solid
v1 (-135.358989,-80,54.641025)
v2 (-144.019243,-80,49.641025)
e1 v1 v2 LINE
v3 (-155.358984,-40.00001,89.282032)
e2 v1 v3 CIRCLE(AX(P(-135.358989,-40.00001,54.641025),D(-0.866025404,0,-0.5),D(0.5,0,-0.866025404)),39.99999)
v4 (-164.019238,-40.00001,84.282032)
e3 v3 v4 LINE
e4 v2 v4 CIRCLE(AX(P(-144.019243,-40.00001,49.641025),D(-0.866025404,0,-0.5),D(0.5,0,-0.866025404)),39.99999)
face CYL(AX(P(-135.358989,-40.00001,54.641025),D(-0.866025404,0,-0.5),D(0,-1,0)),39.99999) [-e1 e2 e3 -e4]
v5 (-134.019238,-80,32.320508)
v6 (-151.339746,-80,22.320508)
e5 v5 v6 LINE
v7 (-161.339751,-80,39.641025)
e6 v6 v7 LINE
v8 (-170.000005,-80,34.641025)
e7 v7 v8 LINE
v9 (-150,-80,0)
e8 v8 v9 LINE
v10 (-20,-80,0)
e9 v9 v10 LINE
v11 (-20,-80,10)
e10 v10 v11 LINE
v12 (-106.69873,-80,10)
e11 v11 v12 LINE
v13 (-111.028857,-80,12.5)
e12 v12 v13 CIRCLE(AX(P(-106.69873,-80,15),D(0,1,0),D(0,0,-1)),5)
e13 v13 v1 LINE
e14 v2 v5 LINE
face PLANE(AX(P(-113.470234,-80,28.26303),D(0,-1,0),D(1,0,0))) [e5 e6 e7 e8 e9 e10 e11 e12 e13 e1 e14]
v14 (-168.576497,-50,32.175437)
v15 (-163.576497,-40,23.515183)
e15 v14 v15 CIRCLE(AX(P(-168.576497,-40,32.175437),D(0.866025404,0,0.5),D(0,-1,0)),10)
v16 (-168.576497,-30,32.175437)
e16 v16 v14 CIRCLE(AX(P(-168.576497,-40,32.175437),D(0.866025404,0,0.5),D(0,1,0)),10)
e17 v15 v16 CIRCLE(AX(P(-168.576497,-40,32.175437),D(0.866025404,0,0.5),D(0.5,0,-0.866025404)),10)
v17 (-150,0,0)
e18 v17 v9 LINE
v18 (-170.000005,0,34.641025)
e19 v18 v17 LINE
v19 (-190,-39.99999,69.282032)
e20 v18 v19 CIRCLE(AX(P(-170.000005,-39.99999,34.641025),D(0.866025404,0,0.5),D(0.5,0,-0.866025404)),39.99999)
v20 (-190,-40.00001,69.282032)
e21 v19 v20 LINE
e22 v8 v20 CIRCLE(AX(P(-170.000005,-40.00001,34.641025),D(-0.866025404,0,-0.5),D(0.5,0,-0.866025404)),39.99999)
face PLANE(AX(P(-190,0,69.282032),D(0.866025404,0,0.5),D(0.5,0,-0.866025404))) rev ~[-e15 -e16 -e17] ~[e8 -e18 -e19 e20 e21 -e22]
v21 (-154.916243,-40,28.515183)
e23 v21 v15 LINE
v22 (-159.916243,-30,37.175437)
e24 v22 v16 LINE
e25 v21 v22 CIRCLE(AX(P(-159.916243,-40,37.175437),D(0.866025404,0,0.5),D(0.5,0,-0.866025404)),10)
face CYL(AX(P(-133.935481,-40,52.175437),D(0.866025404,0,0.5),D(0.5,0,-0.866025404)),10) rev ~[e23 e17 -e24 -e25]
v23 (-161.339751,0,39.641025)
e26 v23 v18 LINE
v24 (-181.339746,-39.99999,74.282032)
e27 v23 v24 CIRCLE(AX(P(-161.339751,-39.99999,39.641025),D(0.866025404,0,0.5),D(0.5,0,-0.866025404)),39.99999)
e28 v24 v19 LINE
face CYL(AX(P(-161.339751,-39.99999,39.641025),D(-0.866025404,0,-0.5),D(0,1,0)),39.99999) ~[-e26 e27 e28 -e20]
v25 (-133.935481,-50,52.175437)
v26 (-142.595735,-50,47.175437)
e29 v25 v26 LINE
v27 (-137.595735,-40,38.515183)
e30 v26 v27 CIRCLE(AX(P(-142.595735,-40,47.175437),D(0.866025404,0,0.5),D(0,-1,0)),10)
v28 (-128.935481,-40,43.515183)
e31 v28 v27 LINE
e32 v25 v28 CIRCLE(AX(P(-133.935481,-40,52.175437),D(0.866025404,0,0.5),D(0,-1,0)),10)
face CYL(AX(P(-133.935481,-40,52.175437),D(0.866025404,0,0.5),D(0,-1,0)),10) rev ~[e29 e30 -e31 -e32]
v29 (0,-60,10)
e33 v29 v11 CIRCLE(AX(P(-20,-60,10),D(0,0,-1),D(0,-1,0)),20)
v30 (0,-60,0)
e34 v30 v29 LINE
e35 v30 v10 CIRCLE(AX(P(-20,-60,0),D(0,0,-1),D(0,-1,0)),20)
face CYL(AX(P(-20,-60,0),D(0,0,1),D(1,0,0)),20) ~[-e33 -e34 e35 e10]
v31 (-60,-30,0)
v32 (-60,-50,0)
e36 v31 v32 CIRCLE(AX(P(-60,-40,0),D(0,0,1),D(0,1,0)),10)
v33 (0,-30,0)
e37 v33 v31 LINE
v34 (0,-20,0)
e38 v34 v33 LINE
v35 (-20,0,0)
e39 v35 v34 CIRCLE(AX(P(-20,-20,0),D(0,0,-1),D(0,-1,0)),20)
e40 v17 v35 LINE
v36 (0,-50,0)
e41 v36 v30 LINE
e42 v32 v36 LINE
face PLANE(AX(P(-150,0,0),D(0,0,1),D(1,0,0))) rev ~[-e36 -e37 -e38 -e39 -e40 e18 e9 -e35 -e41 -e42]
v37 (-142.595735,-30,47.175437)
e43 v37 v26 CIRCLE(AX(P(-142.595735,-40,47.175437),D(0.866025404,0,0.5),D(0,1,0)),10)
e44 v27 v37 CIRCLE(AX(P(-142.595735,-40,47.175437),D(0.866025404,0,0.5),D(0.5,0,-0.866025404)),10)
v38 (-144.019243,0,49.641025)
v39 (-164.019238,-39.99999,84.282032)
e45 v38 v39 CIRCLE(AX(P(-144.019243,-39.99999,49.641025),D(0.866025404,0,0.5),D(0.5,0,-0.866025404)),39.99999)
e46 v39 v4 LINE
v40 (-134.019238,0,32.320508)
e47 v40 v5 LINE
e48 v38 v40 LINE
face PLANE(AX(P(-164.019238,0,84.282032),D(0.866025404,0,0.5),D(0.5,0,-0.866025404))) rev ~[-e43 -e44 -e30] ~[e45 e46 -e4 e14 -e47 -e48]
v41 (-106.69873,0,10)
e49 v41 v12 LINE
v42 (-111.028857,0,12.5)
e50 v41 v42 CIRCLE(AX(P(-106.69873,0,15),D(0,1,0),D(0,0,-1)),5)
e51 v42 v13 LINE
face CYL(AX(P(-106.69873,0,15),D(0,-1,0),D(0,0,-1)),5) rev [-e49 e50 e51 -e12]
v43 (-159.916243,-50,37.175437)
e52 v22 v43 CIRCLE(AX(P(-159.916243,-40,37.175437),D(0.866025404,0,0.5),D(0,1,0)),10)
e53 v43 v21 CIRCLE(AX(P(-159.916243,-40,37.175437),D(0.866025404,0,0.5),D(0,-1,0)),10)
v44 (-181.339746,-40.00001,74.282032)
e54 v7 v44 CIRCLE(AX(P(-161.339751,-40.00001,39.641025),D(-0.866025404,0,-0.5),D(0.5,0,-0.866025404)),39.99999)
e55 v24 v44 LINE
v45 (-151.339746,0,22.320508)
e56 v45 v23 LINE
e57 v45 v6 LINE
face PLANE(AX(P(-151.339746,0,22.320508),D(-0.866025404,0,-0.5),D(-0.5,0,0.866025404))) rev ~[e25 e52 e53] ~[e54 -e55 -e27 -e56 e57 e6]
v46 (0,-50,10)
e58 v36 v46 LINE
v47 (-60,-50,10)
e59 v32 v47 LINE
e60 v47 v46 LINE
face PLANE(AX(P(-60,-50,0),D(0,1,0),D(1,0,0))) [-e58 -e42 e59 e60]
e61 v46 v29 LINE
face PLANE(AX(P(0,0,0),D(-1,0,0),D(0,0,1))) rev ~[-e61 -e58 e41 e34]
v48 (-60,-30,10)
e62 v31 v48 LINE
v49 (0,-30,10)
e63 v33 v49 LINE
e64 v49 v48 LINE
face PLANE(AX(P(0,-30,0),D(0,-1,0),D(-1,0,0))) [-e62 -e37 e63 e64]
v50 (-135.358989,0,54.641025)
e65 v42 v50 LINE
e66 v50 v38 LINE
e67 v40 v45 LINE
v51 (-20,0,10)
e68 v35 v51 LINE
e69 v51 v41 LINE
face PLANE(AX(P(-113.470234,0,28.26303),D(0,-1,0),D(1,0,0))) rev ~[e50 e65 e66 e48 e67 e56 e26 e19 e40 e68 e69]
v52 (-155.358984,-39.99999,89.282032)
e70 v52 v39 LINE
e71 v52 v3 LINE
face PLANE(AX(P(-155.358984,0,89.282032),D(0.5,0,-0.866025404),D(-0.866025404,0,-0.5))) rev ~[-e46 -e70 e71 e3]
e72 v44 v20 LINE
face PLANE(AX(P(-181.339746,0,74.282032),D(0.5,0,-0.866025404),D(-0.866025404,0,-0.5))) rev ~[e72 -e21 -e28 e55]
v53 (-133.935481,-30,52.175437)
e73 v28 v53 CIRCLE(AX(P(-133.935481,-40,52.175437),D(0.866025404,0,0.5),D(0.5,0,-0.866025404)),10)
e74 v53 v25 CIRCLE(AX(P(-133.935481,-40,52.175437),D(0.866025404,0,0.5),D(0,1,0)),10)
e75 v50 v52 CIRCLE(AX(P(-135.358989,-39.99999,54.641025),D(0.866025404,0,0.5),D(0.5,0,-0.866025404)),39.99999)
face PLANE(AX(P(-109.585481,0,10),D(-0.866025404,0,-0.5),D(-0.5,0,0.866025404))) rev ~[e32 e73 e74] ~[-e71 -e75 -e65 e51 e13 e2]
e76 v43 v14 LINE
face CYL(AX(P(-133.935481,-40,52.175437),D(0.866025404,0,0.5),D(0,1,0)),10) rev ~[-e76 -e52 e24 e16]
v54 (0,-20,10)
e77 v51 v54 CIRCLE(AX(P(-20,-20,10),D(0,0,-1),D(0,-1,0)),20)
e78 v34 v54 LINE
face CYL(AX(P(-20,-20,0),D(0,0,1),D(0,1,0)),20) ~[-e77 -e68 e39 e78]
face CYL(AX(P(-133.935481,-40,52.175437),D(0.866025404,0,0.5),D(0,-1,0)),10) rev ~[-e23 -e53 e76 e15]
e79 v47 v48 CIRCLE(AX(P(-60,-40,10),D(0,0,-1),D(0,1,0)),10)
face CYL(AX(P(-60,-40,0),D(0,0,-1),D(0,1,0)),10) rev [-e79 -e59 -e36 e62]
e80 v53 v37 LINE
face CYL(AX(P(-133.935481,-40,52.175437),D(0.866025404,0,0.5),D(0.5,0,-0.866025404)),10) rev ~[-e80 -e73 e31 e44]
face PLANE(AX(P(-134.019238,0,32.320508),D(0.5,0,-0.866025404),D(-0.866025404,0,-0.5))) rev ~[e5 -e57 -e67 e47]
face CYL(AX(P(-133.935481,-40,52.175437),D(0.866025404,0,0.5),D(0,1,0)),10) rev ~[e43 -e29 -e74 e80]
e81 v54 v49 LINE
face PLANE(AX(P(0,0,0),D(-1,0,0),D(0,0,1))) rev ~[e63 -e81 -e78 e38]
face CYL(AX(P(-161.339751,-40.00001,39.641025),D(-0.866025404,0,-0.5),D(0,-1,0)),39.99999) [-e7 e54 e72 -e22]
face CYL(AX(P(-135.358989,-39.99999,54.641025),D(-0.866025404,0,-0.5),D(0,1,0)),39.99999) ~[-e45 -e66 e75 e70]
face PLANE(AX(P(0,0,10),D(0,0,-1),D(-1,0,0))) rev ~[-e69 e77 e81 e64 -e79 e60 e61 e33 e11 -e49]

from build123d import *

# Parameters (mm, degrees)
F1_DEPTH = 80
F3_DEPTH = 27.9
F4_R     = 20
F6_R     = 39.99999
F7_R     = 5
F8_DEPTH = 148.2


# Not quite as in the source:
# - a fillet or chamfer is up to 0.001 mm smaller than in the source, because OpenCascade refuses the exact size


with BuildPart() as f1:
    # F0 (on Front) → F1 (new body)
    with BuildSketch(Plane.XZ):
        Polygon((-150, 0), (0, 0), (0, 10), (-109.5854811567, 10), (-155.3589838486, 89.2820323028), (-164.0192378865, 84.2820323028), (-134.0192378865, 32.3205080757), (-151.3397459622, 22.3205080757), (-181.3397459622, 74.2820323028), (-190, 69.2820323028), align=None)
    extrude(amount=F1_DEPTH)

    # F2 (on Top) → F3 (cut)
    with BuildSketch(Plane.XY):
        with BuildLine():
            Line((-60, -40), (-60, -30))
            ThreePointArc((-60, -30), (-70, -40), (-60, -50))
            Line((-60, -50), (-60, -40))
        make_face()
        with BuildLine():
            ThreePointArc((-50, -40), (-52.9289321881, -32.9289321881), (-60, -30))
            Line((-60, -30), (-60, -40))
            Line((-60, -40), (-50, -40))
        make_face()
        with BuildLine():
            ThreePointArc((-60, -50), (-52.9289321881, -47.0710678119), (-50, -40))
            Line((-50, -40), (-60, -40))
            Line((-60, -40), (-60, -50))
        make_face()
        with BuildLine():
            Line((0, -50), (0, -40))
            Line((0, -40), (-50, -40))
            ThreePointArc((-50, -40), (-52.9289321881, -47.0710678119), (-60, -50))
            Line((-60, -50), (0, -50))
        make_face()
        with BuildLine():
            Line((0, -40), (0, -30))
            Line((0, -30), (-60, -30))
            ThreePointArc((-60, -30), (-52.9289321881, -32.9289321881), (-50, -40))
            Line((-50, -40), (0, -40))
        make_face()
    extrude(amount=F3_DEPTH, mode=Mode.SUBTRACT)

    # F4
    f4_edges = [f1.edges().sort_by_distance(p)[0] for p in [
        (0, 0, 5),
        (0, -80, 5),
    ]]
    fillet(f4_edges, radius=F4_R)

    # F6 (radius 40 in the source; OpenCascade refuses exactly that, so slightly less here)
    f6_edges = [f1.edges().sort_by_distance(p)[0] for p in [
        (-159.689111, 0, 86.782032),
        (-185.669873, 0, 71.782032),
        (-185.669873, -80, 71.782032),
        (-159.689111, -80, 86.782032),
    ]]
    fillet(f6_edges, radius=F6_R)

    # F7
    f7_edges = [f1.edges().sort_by_distance(p)[0] for p in [
        (-109.585481, -40, 10),
    ]]
    fillet(f7_edges, radius=F7_R)

    # F5 (on face) → F8 (cut)
    with BuildSketch(Plane(origin=(-77.8589838486, 0, -44.9519052838), x_dir=(0, 1, 0), z_dir=(0.8660254038, 0, 0.5))):
        with BuildLine():
            Line((-40, 112.1529946162), (-40, 102.1529946162))
            ThreePointArc((-40, 102.1529946162), (-32.9289321881, 105.0819268043), (-30, 112.1529946162))
            ThreePointArc((-30, 112.1529946162), (-40, 122.1529946162), (-50, 112.1529946162))
            Line((-50, 112.1529946162), (-40, 112.1529946162))
        make_face()
        with BuildLine():
            ThreePointArc((-50, 112.1529946162), (-47.0710678119, 105.0819268043), (-40, 102.1529946162))
            Line((-40, 102.1529946162), (-40, 112.1529946162))
            Line((-40, 112.1529946162), (-50, 112.1529946162))
        make_face()
    extrude(amount=-F8_DEPTH, mode=Mode.SUBTRACT)


solid = f1.part
